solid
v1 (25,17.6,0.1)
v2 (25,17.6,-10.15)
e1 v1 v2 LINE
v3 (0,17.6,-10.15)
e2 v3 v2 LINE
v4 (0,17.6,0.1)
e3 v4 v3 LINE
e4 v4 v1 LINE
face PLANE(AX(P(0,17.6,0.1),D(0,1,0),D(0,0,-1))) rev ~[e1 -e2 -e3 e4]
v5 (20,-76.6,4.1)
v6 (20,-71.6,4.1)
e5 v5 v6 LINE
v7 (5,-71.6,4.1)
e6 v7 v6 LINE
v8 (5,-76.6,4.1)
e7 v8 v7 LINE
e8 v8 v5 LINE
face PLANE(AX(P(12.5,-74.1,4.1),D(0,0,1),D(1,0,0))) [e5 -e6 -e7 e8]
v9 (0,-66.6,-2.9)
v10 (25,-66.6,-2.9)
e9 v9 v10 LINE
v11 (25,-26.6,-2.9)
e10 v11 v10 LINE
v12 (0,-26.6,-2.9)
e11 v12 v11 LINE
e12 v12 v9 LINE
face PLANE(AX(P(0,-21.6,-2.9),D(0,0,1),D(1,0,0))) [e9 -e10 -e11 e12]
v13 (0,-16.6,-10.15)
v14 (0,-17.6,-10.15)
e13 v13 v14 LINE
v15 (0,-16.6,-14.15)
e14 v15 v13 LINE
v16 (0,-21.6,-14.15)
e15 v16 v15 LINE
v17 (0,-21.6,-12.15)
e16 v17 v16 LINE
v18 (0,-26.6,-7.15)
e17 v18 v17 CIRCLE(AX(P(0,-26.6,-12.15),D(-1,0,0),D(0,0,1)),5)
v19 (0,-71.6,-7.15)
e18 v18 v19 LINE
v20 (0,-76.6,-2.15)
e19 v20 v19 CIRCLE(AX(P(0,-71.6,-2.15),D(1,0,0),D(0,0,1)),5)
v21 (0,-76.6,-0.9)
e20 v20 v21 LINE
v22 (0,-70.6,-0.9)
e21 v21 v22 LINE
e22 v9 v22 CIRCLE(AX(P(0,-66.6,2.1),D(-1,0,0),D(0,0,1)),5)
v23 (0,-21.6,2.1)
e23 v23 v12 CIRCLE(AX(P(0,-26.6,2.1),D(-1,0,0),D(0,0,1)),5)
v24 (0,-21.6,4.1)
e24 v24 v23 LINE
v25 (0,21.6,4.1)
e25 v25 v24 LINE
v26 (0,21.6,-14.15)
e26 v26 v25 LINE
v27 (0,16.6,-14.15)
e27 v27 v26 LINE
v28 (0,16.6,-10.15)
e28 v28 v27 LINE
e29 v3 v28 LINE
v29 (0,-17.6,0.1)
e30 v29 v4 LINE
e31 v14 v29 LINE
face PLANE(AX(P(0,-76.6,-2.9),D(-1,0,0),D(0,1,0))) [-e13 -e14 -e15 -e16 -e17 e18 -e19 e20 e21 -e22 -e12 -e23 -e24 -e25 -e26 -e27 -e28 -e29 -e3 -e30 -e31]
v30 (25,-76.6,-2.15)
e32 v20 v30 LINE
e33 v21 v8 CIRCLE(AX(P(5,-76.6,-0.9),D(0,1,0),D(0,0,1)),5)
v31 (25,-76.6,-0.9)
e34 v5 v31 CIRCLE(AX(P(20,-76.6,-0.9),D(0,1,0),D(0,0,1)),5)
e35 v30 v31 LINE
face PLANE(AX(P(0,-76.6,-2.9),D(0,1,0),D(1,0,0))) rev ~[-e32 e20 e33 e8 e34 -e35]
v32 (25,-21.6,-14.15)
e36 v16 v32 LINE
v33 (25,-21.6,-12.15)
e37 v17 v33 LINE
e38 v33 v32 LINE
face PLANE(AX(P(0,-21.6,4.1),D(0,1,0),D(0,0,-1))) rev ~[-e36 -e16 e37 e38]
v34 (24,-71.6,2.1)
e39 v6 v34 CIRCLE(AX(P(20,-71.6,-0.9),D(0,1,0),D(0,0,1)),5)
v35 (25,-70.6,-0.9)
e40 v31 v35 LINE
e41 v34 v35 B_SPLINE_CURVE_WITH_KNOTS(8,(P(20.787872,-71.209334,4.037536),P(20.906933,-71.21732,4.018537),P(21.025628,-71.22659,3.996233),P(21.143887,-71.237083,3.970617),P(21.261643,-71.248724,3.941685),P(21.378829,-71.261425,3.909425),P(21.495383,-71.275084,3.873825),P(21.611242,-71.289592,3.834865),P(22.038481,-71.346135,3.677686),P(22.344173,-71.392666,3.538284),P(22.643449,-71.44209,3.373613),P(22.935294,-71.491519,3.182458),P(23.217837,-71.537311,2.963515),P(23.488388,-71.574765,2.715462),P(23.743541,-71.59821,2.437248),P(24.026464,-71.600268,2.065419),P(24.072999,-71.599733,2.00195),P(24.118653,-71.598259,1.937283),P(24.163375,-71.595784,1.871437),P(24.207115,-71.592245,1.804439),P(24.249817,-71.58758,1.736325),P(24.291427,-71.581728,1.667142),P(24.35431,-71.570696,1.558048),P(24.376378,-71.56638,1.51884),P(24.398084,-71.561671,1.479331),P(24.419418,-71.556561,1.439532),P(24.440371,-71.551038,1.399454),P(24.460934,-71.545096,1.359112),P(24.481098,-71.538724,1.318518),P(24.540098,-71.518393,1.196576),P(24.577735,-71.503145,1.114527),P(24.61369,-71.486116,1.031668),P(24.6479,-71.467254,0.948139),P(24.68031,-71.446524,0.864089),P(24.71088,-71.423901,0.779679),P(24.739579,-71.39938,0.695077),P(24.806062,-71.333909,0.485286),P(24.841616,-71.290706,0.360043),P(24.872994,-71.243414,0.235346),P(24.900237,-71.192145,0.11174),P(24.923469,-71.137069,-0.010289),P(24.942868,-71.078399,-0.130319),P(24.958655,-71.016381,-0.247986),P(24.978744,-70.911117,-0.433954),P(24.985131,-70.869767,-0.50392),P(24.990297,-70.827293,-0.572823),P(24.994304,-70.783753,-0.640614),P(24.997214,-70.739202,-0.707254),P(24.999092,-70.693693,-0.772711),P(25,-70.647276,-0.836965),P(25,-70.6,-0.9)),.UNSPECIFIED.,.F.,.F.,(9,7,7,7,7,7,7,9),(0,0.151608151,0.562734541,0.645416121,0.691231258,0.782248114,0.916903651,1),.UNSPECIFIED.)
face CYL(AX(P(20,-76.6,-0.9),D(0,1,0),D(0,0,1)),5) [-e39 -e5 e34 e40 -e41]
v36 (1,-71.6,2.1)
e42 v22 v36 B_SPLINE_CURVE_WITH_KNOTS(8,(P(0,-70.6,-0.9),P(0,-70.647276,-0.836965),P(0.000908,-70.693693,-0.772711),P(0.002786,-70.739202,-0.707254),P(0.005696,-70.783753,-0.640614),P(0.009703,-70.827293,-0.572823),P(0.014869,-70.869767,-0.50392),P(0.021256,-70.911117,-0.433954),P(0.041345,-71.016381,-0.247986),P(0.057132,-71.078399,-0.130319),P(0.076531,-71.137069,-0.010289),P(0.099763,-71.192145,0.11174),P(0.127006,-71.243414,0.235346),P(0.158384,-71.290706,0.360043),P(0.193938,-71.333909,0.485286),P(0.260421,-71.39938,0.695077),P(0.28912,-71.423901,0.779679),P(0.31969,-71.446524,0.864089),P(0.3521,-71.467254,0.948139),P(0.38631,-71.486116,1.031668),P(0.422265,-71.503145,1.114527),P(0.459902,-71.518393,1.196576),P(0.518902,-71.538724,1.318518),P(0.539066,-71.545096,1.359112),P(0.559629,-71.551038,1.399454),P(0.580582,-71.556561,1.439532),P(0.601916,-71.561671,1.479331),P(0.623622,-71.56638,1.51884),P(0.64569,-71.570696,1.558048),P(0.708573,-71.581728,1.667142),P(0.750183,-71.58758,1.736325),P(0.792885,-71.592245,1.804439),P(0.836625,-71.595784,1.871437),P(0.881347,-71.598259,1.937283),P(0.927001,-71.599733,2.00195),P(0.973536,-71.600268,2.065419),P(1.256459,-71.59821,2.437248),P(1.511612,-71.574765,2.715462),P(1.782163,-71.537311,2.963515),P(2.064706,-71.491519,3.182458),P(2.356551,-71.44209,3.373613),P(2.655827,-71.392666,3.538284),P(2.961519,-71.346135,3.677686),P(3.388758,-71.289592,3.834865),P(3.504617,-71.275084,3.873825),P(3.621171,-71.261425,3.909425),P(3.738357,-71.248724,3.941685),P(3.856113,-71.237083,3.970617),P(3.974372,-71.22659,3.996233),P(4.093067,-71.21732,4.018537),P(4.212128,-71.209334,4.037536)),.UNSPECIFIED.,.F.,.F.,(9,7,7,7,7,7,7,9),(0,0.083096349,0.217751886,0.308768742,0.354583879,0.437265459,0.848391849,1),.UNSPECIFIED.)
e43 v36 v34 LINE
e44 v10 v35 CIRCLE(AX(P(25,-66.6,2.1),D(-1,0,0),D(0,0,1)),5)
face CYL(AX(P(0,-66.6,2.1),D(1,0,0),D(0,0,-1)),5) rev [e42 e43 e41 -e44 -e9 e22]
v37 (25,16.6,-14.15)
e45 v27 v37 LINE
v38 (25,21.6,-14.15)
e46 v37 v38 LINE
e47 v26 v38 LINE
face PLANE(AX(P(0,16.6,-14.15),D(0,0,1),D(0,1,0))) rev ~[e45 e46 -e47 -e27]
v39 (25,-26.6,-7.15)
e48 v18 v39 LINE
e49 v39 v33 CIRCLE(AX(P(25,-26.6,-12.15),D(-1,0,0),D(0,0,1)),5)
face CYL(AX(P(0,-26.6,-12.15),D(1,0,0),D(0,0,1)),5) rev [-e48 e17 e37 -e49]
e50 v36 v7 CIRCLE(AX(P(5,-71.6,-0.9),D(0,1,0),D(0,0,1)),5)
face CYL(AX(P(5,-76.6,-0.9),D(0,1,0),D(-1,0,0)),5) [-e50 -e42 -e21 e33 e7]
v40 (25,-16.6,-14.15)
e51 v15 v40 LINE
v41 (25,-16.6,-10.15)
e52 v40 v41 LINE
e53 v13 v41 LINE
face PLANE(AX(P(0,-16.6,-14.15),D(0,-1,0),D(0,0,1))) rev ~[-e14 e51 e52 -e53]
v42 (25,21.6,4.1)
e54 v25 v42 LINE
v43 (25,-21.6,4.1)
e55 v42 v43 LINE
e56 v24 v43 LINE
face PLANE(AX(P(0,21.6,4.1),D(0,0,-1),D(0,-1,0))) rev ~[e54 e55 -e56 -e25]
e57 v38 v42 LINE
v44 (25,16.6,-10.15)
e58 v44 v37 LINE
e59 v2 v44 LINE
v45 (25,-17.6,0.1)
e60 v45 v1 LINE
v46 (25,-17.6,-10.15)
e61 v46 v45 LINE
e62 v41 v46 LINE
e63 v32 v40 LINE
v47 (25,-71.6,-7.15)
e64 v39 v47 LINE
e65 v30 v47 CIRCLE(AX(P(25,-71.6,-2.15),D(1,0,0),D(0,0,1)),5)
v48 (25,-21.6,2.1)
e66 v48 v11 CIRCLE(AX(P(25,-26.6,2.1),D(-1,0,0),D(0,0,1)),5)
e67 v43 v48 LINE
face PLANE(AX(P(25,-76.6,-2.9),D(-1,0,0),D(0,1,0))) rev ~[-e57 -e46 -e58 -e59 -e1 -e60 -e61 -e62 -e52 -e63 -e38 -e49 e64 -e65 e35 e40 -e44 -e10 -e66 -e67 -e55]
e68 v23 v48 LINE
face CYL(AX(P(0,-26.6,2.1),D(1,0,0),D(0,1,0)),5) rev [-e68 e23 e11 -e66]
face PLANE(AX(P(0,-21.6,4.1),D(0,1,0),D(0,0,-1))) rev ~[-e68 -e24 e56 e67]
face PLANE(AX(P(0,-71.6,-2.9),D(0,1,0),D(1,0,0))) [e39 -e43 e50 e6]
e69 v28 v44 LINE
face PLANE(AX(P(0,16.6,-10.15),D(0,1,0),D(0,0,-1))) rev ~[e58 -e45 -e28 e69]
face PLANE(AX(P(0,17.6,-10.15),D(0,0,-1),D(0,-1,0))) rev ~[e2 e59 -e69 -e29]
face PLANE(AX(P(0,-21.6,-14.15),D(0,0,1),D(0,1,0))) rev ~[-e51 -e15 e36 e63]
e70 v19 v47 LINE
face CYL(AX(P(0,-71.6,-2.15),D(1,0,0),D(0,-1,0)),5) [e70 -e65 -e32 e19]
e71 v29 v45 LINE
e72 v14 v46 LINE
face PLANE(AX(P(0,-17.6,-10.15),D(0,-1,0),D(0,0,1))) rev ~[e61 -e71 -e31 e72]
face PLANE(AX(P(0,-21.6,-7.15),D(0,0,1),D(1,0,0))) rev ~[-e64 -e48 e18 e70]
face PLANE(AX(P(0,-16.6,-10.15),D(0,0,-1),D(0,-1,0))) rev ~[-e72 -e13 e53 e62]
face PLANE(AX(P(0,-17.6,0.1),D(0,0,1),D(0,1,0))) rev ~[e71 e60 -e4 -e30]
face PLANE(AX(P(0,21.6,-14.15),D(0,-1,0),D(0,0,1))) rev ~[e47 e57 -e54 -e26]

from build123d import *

# Parameters (mm, degrees)
F1_DEPTH = 25
F3_W     = 25
F3_H     = 4.25
F4_DEPTH = 55
F5_W     = 25
F5_H     = 5
F6_DEPTH = 7
F7_R     = 5
F8_R     = 5


# Not quite as in the source:
# - a feature of the source that left no trace in its solid (it failed there, or was rolled back) is left out


with BuildPart() as f1:
    # F0 (on Right) → F1 (new body)
    with BuildSketch(Plane.YZ):
        Polygon((17.6, 0.1), (17.6, -10.15), (16.6, -10.15), (16.6, -14.15), (21.6, -14.15), (21.6, 4.1), (0, 4.1), (-21.6, 4.1), (-21.6, -14.15), (-16.6, -14.15), (-16.6, -10.15), (-17.6, -10.15), (-17.6, 0.1), (0, 0.1), align=None)
    extrude(amount=F1_DEPTH)

    # F3 (on face) → F4 (join)
    with BuildSketch(Plane.XZ.offset(21.6)):
        with Locations((12.5, -5.025)):
            Rectangle(F3_W, F3_H)
    extrude(amount=F4_DEPTH)

    # F5 (on face) → F6 (join, through all)
    with BuildSketch(Plane.XY.offset(-2.9)):
        with Locations((12.5, -74.1)):
            Rectangle(F5_W, F5_H)
    extrude(amount=F6_DEPTH)

    # F7
    f7_edges = [f1.edges().sort_by_distance(p)[0] for p in [
        (12.5, -21.6, -2.9),
        (12.5, -21.6, -7.15),
        (12.5, -71.6, -2.9),
        (12.5, -76.6, -7.15),
    ]]
    fillet(f7_edges, radius=F7_R)

    # F8
    f8_edges = [f1.edges().sort_by_distance(p)[0] for p in [
        (0, -74.1, 4.1),
        (25, -74.1, 4.1),
    ]]
    fillet(f8_edges, radius=F8_R)


solid = f1.part
